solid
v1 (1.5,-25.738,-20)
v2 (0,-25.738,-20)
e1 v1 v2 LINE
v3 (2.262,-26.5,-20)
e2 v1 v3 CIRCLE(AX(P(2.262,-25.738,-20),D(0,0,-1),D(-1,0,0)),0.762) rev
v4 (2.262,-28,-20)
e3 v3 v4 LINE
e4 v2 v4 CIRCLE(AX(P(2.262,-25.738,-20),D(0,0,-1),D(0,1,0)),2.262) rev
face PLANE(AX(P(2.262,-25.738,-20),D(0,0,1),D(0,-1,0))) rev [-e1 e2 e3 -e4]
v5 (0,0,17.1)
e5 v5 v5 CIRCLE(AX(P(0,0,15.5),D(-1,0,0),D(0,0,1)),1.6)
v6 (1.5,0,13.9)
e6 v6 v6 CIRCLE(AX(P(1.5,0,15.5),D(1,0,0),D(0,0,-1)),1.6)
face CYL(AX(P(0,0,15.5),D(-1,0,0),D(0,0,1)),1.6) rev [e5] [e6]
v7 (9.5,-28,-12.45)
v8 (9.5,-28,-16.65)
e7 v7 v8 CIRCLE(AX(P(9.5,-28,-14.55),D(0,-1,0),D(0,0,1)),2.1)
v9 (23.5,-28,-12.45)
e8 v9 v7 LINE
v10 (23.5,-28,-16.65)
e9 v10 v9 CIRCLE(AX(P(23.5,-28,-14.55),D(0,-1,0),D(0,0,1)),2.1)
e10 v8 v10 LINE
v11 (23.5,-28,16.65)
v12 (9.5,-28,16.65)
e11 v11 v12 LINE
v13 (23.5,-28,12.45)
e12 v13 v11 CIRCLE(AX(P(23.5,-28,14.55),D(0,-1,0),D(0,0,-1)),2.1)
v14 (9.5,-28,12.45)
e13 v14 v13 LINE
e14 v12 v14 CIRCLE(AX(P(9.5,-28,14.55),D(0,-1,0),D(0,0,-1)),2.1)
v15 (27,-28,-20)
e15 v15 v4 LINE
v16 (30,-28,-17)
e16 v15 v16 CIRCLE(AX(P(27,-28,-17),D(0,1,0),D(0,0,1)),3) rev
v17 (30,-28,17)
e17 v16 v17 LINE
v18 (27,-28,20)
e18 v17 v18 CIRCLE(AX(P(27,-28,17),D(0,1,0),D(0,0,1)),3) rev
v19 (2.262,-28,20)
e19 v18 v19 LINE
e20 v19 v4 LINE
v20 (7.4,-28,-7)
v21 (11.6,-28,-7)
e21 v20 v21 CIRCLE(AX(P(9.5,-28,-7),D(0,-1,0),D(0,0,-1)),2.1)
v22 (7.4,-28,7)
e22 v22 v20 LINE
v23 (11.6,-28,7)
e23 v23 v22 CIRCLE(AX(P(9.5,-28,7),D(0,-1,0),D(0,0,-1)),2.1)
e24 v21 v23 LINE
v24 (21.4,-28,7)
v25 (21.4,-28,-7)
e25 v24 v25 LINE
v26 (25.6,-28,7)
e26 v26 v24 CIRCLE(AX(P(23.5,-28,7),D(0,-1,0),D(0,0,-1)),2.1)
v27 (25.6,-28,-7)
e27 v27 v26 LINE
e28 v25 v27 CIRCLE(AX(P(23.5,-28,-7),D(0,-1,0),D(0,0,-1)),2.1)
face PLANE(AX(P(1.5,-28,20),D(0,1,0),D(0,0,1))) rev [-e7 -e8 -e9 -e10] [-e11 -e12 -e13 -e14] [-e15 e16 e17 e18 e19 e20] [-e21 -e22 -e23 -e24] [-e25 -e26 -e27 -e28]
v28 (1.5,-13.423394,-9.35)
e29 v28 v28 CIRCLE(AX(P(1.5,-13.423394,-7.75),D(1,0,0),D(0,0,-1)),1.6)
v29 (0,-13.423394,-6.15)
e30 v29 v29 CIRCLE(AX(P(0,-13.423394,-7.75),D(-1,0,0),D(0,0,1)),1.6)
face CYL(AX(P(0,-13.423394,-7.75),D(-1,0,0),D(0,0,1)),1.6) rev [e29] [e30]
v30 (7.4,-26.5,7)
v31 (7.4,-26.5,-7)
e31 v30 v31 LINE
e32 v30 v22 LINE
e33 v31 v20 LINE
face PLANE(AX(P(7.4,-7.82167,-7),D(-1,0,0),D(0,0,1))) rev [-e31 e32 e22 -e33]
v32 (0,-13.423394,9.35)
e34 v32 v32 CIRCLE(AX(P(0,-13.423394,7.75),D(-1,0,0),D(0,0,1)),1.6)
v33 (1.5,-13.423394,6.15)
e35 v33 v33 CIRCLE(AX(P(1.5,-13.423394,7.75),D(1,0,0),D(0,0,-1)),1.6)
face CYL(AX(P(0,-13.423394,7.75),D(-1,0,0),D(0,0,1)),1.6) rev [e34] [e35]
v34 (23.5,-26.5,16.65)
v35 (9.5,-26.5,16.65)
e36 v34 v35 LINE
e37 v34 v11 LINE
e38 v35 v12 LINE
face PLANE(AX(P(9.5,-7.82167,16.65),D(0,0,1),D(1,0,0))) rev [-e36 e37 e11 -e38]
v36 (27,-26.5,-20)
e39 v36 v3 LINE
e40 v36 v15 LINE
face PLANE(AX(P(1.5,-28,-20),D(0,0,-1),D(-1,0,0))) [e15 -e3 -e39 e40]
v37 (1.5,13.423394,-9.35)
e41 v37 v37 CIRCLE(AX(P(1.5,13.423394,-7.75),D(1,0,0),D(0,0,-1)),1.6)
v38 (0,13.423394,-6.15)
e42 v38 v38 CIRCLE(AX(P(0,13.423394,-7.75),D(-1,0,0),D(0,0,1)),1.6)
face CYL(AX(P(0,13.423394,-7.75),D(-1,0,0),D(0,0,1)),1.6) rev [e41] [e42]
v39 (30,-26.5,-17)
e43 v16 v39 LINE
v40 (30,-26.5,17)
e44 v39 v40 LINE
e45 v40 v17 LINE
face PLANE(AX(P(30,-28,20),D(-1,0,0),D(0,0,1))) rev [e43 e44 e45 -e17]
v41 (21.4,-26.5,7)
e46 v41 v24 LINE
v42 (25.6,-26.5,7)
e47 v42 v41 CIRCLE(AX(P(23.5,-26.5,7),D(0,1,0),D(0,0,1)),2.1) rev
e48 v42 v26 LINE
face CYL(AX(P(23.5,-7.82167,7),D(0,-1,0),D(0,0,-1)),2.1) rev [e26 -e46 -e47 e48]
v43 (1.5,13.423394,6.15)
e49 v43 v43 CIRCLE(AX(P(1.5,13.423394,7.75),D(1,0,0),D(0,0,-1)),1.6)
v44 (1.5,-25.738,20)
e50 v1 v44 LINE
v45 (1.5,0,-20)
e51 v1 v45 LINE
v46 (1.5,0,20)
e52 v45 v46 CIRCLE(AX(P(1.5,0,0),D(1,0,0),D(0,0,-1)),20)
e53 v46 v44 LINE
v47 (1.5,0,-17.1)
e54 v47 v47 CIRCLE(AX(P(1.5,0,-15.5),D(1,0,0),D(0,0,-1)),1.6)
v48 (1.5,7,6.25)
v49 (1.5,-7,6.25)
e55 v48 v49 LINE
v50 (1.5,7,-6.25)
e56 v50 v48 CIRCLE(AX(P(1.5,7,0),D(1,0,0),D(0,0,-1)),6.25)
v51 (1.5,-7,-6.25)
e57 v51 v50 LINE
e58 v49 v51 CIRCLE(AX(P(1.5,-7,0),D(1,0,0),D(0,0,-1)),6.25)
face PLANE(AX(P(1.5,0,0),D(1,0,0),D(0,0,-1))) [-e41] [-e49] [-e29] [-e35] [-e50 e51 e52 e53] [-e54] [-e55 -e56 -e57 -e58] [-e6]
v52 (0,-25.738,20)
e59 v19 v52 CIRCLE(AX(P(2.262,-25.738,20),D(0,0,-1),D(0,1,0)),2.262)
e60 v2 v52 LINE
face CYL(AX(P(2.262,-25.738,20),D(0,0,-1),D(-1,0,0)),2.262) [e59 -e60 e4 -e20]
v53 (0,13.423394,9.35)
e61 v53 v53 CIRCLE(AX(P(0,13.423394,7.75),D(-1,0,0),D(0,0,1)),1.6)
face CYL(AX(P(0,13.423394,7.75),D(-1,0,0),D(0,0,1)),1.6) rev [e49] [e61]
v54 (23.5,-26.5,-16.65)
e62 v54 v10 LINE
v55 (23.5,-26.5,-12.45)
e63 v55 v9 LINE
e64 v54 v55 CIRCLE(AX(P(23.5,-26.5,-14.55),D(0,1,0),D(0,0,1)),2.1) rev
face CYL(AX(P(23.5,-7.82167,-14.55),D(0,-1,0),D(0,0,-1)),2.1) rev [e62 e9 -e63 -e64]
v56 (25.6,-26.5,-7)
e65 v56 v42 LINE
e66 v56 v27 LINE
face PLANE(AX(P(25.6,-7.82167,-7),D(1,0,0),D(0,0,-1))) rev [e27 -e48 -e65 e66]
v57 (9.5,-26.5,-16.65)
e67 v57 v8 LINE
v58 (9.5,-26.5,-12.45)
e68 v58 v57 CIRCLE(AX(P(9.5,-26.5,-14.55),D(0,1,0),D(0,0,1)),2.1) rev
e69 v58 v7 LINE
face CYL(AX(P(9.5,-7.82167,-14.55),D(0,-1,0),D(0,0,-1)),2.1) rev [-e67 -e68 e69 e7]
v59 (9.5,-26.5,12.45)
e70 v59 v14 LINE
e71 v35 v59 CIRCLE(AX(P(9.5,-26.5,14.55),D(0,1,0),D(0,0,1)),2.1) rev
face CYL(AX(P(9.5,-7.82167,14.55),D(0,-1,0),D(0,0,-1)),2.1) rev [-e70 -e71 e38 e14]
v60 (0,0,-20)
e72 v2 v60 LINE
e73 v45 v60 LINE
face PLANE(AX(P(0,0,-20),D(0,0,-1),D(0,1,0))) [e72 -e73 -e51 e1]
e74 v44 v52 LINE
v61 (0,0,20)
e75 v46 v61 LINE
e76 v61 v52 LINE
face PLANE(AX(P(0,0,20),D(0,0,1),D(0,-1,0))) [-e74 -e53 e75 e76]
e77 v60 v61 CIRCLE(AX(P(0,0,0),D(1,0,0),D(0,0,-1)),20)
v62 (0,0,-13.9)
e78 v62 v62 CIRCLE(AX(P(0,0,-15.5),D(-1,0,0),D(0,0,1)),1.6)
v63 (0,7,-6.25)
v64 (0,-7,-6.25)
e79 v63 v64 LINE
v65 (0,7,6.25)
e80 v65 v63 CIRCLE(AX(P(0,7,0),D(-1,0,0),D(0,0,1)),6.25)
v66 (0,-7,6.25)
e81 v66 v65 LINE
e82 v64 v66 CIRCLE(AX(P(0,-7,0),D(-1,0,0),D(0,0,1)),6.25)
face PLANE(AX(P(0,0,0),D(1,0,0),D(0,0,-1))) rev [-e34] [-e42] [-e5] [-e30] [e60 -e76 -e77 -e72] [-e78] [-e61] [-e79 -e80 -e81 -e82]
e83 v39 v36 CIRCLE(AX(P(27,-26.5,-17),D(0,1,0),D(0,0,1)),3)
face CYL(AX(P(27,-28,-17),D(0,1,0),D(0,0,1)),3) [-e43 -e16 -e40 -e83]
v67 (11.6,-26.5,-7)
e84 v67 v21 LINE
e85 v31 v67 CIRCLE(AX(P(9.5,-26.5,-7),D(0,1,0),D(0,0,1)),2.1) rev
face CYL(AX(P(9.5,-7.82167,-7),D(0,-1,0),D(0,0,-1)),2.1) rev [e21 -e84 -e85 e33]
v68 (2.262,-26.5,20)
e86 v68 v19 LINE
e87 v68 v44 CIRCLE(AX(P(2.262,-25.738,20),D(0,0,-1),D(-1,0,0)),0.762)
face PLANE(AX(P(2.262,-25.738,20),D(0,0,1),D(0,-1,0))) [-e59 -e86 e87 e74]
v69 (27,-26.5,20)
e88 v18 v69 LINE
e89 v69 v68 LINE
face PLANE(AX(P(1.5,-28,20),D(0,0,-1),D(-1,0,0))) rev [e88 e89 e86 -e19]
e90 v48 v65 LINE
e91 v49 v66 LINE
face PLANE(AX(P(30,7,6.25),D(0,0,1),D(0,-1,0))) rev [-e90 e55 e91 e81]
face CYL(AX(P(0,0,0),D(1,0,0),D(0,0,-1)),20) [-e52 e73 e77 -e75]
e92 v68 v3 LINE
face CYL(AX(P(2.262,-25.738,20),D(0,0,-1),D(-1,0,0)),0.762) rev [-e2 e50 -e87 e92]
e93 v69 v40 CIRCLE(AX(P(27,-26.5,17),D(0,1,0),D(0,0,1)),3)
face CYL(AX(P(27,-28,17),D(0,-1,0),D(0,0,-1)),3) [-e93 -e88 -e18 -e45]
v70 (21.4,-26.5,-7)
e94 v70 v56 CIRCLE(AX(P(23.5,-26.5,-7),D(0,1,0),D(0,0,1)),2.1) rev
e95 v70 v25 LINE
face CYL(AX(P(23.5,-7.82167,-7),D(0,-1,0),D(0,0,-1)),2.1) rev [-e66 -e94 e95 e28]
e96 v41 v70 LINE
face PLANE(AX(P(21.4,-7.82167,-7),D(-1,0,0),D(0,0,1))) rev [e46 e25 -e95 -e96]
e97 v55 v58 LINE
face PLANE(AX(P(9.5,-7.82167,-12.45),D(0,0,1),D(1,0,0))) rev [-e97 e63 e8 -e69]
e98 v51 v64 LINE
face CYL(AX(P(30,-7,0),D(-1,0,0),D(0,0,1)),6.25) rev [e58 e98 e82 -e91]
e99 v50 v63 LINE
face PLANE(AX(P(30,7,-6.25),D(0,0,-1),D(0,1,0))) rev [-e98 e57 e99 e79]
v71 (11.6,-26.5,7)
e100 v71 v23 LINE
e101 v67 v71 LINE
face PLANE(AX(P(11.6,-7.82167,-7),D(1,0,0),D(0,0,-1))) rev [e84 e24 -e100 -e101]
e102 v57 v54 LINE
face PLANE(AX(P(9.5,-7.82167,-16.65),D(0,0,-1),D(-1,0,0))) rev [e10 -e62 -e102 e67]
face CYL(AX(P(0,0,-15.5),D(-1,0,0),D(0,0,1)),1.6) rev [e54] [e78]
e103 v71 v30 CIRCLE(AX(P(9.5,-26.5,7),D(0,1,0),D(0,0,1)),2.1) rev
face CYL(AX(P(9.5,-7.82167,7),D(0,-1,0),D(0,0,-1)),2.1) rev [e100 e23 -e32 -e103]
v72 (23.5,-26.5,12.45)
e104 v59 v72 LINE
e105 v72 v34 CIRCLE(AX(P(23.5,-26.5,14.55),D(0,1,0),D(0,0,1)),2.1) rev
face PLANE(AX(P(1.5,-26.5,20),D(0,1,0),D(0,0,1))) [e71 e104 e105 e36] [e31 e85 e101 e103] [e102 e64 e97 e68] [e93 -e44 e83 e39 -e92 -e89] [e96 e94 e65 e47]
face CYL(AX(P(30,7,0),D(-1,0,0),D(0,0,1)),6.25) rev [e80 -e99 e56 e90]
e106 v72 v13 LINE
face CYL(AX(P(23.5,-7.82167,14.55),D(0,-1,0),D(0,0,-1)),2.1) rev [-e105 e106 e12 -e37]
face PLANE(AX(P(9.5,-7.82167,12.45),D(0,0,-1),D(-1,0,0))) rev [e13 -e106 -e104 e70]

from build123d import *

# Parameters (mm, degrees)
BOSS_EXTRUDE1_DEPTH    = 1.5
SKETCH2_W              = 30
SKETCH2_H              = 40
BOSS_EXTRUDE2_DEPTH    = 1.5
CONVERT_SOLID1_START   = -20
CONVERT_SOLID1_DEPTH   = 40
CONVERT_SOLID1_2_DEPTH = 40
M3_CLEARANCE_HOLE1_D   = 3.2
CIRPATTERN1_COUNT      = 6
CUT_EXTRUDE1_DEPTH     = 46.650848842
FILLET1_R              = 3
CUT_EXTRUDE2_DEPTH     = 1.5


# Read off the part's stored shape, not the designer's step: Convert-Solid1
with BuildPart() as part:
    # Sketch1 → Boss-Extrude1 (new body)
    with BuildSketch(Plane(origin=(0, 0, 0), x_dir=(0, 0, -1), z_dir=(1, 0, 0))):
        with BuildLine():
            Line((-20, 0), (-20, -28))
            Line((-20, -28), (20, -28))
            Line((20, -28), (20, 0))
            ThreePointArc((20, 0), (0, 20), (-20, 0))
        make_face()
    extrude(amount=BOSS_EXTRUDE1_DEPTH)

    # Sketch2 → Boss-Extrude2 (add)
    with BuildSketch(Plane.XZ.offset(28)):
        with Locations((15, 0)):
            Rectangle(SKETCH2_W, SKETCH2_H)
    extrude(amount=-BOSS_EXTRUDE2_DEPTH)

    # Convert-Solid1 outline → Convert-Solid1 (cut)
    with BuildSketch(Plane.XY.offset(CONVERT_SOLID1_START)):
        with BuildLine():
            Line((0, -28), (2.262, -28))
            ThreePointArc((2.262, -28), (0.662524461, -27.337475539), (0, -25.738))
            Line((0, -25.738), (0, -28))
        make_face()
    extrude(amount=CONVERT_SOLID1_DEPTH, mode=Mode.SUBTRACT)

    # Convert-Solid1 2 outline → Convert-Solid1 2 (add)
    with BuildSketch(Plane.XY.offset(CONVERT_SOLID1_START)):
        with BuildLine():
            Line((1.5, -26.5), (2.262, -26.5))
            ThreePointArc((2.262, -26.5), (1.723184633, -26.276815367), (1.5, -25.738))
            Line((1.5, -25.738), (1.5, -26.5))
        make_face()
    extrude(amount=CONVERT_SOLID1_2_DEPTH)

    # M3 Clearance Hole1 (through all)
    with Locations(Plane.ZY):
        with Locations((-15.5, 0)):
            m3_clearance_hole1 = Hole(M3_CLEARANCE_HOLE1_D / 2)

    # CirPattern1: M3 Clearance Hole1 ×6 about axis
    cirpattern1_axis = Axis((0, 0, 0), (1, 0, 0))
    for i in range(1, CIRPATTERN1_COUNT):
        add(m3_clearance_hole1.rotate(cirpattern1_axis, i * 360 / CIRPATTERN1_COUNT), mode=Mode.SUBTRACT)

    # Sketch9 → Cut-Extrude1 (cut, through all)
    with BuildSketch(Plane.ZY):
        with BuildLine():
            Line((6.25, 7), (6.25, -7))
            ThreePointArc((6.25, -7), (0, -13.25), (-6.25, -7))
            Line((-6.25, -7), (-6.25, 7))
            ThreePointArc((-6.25, 7), (0, 13.25), (6.25, 7))
        make_face()
    extrude(amount=-CUT_EXTRUDE1_DEPTH, mode=Mode.SUBTRACT)

    # Fillet1
    fillet1_edges = [part.edges().sort_by_distance(p)[0] for p in [
        (30, -27.25, 20),
        (30, -27.25, -20),
    ]]
    fillet(fillet1_edges, radius=FILLET1_R)

    # Sketch10 → Cut-Extrude2 (cut)
    with BuildSketch(Plane(origin=(0, -28, 0), x_dir=(-1, 0, 0), z_dir=(0, -1, 0))):
        with BuildLine():
            Line((-9.5, -16.65), (-23.5, -16.65))
            ThreePointArc((-23.5, -16.65), (-25.6, -14.55), (-23.5, -12.45))
            Line((-23.5, -12.45), (-9.5, -12.45))
            ThreePointArc((-9.5, -12.45), (-7.4, -14.55), (-9.5, -16.65))
        make_face()
        with BuildLine():
            Line((-7.4, 7), (-7.4, -7))
            ThreePointArc((-7.4, -7), (-9.5, -9.1), (-11.6, -7))
            Line((-11.6, -7), (-11.6, 7))
            ThreePointArc((-11.6, 7), (-9.5, 9.1), (-7.4, 7))
        make_face()
        with BuildLine():
            Line((-21.4, 7), (-21.4, -7))
            ThreePointArc((-21.4, -7), (-23.5, -9.1), (-25.6, -7))
            Line((-25.6, -7), (-25.6, 7))
            ThreePointArc((-25.6, 7), (-23.5, 9.1), (-21.4, 7))
        make_face()
        with BuildLine():
            Line((-9.5, 16.65), (-23.5, 16.65))
            ThreePointArc((-23.5, 16.65), (-25.6, 14.55), (-23.5, 12.45))
            Line((-23.5, 12.45), (-9.5, 12.45))
            ThreePointArc((-9.5, 12.45), (-7.4, 14.55), (-9.5, 16.65))
        make_face()
    extrude(amount=-CUT_EXTRUDE2_DEPTH, mode=Mode.SUBTRACT)


solid = part.part
